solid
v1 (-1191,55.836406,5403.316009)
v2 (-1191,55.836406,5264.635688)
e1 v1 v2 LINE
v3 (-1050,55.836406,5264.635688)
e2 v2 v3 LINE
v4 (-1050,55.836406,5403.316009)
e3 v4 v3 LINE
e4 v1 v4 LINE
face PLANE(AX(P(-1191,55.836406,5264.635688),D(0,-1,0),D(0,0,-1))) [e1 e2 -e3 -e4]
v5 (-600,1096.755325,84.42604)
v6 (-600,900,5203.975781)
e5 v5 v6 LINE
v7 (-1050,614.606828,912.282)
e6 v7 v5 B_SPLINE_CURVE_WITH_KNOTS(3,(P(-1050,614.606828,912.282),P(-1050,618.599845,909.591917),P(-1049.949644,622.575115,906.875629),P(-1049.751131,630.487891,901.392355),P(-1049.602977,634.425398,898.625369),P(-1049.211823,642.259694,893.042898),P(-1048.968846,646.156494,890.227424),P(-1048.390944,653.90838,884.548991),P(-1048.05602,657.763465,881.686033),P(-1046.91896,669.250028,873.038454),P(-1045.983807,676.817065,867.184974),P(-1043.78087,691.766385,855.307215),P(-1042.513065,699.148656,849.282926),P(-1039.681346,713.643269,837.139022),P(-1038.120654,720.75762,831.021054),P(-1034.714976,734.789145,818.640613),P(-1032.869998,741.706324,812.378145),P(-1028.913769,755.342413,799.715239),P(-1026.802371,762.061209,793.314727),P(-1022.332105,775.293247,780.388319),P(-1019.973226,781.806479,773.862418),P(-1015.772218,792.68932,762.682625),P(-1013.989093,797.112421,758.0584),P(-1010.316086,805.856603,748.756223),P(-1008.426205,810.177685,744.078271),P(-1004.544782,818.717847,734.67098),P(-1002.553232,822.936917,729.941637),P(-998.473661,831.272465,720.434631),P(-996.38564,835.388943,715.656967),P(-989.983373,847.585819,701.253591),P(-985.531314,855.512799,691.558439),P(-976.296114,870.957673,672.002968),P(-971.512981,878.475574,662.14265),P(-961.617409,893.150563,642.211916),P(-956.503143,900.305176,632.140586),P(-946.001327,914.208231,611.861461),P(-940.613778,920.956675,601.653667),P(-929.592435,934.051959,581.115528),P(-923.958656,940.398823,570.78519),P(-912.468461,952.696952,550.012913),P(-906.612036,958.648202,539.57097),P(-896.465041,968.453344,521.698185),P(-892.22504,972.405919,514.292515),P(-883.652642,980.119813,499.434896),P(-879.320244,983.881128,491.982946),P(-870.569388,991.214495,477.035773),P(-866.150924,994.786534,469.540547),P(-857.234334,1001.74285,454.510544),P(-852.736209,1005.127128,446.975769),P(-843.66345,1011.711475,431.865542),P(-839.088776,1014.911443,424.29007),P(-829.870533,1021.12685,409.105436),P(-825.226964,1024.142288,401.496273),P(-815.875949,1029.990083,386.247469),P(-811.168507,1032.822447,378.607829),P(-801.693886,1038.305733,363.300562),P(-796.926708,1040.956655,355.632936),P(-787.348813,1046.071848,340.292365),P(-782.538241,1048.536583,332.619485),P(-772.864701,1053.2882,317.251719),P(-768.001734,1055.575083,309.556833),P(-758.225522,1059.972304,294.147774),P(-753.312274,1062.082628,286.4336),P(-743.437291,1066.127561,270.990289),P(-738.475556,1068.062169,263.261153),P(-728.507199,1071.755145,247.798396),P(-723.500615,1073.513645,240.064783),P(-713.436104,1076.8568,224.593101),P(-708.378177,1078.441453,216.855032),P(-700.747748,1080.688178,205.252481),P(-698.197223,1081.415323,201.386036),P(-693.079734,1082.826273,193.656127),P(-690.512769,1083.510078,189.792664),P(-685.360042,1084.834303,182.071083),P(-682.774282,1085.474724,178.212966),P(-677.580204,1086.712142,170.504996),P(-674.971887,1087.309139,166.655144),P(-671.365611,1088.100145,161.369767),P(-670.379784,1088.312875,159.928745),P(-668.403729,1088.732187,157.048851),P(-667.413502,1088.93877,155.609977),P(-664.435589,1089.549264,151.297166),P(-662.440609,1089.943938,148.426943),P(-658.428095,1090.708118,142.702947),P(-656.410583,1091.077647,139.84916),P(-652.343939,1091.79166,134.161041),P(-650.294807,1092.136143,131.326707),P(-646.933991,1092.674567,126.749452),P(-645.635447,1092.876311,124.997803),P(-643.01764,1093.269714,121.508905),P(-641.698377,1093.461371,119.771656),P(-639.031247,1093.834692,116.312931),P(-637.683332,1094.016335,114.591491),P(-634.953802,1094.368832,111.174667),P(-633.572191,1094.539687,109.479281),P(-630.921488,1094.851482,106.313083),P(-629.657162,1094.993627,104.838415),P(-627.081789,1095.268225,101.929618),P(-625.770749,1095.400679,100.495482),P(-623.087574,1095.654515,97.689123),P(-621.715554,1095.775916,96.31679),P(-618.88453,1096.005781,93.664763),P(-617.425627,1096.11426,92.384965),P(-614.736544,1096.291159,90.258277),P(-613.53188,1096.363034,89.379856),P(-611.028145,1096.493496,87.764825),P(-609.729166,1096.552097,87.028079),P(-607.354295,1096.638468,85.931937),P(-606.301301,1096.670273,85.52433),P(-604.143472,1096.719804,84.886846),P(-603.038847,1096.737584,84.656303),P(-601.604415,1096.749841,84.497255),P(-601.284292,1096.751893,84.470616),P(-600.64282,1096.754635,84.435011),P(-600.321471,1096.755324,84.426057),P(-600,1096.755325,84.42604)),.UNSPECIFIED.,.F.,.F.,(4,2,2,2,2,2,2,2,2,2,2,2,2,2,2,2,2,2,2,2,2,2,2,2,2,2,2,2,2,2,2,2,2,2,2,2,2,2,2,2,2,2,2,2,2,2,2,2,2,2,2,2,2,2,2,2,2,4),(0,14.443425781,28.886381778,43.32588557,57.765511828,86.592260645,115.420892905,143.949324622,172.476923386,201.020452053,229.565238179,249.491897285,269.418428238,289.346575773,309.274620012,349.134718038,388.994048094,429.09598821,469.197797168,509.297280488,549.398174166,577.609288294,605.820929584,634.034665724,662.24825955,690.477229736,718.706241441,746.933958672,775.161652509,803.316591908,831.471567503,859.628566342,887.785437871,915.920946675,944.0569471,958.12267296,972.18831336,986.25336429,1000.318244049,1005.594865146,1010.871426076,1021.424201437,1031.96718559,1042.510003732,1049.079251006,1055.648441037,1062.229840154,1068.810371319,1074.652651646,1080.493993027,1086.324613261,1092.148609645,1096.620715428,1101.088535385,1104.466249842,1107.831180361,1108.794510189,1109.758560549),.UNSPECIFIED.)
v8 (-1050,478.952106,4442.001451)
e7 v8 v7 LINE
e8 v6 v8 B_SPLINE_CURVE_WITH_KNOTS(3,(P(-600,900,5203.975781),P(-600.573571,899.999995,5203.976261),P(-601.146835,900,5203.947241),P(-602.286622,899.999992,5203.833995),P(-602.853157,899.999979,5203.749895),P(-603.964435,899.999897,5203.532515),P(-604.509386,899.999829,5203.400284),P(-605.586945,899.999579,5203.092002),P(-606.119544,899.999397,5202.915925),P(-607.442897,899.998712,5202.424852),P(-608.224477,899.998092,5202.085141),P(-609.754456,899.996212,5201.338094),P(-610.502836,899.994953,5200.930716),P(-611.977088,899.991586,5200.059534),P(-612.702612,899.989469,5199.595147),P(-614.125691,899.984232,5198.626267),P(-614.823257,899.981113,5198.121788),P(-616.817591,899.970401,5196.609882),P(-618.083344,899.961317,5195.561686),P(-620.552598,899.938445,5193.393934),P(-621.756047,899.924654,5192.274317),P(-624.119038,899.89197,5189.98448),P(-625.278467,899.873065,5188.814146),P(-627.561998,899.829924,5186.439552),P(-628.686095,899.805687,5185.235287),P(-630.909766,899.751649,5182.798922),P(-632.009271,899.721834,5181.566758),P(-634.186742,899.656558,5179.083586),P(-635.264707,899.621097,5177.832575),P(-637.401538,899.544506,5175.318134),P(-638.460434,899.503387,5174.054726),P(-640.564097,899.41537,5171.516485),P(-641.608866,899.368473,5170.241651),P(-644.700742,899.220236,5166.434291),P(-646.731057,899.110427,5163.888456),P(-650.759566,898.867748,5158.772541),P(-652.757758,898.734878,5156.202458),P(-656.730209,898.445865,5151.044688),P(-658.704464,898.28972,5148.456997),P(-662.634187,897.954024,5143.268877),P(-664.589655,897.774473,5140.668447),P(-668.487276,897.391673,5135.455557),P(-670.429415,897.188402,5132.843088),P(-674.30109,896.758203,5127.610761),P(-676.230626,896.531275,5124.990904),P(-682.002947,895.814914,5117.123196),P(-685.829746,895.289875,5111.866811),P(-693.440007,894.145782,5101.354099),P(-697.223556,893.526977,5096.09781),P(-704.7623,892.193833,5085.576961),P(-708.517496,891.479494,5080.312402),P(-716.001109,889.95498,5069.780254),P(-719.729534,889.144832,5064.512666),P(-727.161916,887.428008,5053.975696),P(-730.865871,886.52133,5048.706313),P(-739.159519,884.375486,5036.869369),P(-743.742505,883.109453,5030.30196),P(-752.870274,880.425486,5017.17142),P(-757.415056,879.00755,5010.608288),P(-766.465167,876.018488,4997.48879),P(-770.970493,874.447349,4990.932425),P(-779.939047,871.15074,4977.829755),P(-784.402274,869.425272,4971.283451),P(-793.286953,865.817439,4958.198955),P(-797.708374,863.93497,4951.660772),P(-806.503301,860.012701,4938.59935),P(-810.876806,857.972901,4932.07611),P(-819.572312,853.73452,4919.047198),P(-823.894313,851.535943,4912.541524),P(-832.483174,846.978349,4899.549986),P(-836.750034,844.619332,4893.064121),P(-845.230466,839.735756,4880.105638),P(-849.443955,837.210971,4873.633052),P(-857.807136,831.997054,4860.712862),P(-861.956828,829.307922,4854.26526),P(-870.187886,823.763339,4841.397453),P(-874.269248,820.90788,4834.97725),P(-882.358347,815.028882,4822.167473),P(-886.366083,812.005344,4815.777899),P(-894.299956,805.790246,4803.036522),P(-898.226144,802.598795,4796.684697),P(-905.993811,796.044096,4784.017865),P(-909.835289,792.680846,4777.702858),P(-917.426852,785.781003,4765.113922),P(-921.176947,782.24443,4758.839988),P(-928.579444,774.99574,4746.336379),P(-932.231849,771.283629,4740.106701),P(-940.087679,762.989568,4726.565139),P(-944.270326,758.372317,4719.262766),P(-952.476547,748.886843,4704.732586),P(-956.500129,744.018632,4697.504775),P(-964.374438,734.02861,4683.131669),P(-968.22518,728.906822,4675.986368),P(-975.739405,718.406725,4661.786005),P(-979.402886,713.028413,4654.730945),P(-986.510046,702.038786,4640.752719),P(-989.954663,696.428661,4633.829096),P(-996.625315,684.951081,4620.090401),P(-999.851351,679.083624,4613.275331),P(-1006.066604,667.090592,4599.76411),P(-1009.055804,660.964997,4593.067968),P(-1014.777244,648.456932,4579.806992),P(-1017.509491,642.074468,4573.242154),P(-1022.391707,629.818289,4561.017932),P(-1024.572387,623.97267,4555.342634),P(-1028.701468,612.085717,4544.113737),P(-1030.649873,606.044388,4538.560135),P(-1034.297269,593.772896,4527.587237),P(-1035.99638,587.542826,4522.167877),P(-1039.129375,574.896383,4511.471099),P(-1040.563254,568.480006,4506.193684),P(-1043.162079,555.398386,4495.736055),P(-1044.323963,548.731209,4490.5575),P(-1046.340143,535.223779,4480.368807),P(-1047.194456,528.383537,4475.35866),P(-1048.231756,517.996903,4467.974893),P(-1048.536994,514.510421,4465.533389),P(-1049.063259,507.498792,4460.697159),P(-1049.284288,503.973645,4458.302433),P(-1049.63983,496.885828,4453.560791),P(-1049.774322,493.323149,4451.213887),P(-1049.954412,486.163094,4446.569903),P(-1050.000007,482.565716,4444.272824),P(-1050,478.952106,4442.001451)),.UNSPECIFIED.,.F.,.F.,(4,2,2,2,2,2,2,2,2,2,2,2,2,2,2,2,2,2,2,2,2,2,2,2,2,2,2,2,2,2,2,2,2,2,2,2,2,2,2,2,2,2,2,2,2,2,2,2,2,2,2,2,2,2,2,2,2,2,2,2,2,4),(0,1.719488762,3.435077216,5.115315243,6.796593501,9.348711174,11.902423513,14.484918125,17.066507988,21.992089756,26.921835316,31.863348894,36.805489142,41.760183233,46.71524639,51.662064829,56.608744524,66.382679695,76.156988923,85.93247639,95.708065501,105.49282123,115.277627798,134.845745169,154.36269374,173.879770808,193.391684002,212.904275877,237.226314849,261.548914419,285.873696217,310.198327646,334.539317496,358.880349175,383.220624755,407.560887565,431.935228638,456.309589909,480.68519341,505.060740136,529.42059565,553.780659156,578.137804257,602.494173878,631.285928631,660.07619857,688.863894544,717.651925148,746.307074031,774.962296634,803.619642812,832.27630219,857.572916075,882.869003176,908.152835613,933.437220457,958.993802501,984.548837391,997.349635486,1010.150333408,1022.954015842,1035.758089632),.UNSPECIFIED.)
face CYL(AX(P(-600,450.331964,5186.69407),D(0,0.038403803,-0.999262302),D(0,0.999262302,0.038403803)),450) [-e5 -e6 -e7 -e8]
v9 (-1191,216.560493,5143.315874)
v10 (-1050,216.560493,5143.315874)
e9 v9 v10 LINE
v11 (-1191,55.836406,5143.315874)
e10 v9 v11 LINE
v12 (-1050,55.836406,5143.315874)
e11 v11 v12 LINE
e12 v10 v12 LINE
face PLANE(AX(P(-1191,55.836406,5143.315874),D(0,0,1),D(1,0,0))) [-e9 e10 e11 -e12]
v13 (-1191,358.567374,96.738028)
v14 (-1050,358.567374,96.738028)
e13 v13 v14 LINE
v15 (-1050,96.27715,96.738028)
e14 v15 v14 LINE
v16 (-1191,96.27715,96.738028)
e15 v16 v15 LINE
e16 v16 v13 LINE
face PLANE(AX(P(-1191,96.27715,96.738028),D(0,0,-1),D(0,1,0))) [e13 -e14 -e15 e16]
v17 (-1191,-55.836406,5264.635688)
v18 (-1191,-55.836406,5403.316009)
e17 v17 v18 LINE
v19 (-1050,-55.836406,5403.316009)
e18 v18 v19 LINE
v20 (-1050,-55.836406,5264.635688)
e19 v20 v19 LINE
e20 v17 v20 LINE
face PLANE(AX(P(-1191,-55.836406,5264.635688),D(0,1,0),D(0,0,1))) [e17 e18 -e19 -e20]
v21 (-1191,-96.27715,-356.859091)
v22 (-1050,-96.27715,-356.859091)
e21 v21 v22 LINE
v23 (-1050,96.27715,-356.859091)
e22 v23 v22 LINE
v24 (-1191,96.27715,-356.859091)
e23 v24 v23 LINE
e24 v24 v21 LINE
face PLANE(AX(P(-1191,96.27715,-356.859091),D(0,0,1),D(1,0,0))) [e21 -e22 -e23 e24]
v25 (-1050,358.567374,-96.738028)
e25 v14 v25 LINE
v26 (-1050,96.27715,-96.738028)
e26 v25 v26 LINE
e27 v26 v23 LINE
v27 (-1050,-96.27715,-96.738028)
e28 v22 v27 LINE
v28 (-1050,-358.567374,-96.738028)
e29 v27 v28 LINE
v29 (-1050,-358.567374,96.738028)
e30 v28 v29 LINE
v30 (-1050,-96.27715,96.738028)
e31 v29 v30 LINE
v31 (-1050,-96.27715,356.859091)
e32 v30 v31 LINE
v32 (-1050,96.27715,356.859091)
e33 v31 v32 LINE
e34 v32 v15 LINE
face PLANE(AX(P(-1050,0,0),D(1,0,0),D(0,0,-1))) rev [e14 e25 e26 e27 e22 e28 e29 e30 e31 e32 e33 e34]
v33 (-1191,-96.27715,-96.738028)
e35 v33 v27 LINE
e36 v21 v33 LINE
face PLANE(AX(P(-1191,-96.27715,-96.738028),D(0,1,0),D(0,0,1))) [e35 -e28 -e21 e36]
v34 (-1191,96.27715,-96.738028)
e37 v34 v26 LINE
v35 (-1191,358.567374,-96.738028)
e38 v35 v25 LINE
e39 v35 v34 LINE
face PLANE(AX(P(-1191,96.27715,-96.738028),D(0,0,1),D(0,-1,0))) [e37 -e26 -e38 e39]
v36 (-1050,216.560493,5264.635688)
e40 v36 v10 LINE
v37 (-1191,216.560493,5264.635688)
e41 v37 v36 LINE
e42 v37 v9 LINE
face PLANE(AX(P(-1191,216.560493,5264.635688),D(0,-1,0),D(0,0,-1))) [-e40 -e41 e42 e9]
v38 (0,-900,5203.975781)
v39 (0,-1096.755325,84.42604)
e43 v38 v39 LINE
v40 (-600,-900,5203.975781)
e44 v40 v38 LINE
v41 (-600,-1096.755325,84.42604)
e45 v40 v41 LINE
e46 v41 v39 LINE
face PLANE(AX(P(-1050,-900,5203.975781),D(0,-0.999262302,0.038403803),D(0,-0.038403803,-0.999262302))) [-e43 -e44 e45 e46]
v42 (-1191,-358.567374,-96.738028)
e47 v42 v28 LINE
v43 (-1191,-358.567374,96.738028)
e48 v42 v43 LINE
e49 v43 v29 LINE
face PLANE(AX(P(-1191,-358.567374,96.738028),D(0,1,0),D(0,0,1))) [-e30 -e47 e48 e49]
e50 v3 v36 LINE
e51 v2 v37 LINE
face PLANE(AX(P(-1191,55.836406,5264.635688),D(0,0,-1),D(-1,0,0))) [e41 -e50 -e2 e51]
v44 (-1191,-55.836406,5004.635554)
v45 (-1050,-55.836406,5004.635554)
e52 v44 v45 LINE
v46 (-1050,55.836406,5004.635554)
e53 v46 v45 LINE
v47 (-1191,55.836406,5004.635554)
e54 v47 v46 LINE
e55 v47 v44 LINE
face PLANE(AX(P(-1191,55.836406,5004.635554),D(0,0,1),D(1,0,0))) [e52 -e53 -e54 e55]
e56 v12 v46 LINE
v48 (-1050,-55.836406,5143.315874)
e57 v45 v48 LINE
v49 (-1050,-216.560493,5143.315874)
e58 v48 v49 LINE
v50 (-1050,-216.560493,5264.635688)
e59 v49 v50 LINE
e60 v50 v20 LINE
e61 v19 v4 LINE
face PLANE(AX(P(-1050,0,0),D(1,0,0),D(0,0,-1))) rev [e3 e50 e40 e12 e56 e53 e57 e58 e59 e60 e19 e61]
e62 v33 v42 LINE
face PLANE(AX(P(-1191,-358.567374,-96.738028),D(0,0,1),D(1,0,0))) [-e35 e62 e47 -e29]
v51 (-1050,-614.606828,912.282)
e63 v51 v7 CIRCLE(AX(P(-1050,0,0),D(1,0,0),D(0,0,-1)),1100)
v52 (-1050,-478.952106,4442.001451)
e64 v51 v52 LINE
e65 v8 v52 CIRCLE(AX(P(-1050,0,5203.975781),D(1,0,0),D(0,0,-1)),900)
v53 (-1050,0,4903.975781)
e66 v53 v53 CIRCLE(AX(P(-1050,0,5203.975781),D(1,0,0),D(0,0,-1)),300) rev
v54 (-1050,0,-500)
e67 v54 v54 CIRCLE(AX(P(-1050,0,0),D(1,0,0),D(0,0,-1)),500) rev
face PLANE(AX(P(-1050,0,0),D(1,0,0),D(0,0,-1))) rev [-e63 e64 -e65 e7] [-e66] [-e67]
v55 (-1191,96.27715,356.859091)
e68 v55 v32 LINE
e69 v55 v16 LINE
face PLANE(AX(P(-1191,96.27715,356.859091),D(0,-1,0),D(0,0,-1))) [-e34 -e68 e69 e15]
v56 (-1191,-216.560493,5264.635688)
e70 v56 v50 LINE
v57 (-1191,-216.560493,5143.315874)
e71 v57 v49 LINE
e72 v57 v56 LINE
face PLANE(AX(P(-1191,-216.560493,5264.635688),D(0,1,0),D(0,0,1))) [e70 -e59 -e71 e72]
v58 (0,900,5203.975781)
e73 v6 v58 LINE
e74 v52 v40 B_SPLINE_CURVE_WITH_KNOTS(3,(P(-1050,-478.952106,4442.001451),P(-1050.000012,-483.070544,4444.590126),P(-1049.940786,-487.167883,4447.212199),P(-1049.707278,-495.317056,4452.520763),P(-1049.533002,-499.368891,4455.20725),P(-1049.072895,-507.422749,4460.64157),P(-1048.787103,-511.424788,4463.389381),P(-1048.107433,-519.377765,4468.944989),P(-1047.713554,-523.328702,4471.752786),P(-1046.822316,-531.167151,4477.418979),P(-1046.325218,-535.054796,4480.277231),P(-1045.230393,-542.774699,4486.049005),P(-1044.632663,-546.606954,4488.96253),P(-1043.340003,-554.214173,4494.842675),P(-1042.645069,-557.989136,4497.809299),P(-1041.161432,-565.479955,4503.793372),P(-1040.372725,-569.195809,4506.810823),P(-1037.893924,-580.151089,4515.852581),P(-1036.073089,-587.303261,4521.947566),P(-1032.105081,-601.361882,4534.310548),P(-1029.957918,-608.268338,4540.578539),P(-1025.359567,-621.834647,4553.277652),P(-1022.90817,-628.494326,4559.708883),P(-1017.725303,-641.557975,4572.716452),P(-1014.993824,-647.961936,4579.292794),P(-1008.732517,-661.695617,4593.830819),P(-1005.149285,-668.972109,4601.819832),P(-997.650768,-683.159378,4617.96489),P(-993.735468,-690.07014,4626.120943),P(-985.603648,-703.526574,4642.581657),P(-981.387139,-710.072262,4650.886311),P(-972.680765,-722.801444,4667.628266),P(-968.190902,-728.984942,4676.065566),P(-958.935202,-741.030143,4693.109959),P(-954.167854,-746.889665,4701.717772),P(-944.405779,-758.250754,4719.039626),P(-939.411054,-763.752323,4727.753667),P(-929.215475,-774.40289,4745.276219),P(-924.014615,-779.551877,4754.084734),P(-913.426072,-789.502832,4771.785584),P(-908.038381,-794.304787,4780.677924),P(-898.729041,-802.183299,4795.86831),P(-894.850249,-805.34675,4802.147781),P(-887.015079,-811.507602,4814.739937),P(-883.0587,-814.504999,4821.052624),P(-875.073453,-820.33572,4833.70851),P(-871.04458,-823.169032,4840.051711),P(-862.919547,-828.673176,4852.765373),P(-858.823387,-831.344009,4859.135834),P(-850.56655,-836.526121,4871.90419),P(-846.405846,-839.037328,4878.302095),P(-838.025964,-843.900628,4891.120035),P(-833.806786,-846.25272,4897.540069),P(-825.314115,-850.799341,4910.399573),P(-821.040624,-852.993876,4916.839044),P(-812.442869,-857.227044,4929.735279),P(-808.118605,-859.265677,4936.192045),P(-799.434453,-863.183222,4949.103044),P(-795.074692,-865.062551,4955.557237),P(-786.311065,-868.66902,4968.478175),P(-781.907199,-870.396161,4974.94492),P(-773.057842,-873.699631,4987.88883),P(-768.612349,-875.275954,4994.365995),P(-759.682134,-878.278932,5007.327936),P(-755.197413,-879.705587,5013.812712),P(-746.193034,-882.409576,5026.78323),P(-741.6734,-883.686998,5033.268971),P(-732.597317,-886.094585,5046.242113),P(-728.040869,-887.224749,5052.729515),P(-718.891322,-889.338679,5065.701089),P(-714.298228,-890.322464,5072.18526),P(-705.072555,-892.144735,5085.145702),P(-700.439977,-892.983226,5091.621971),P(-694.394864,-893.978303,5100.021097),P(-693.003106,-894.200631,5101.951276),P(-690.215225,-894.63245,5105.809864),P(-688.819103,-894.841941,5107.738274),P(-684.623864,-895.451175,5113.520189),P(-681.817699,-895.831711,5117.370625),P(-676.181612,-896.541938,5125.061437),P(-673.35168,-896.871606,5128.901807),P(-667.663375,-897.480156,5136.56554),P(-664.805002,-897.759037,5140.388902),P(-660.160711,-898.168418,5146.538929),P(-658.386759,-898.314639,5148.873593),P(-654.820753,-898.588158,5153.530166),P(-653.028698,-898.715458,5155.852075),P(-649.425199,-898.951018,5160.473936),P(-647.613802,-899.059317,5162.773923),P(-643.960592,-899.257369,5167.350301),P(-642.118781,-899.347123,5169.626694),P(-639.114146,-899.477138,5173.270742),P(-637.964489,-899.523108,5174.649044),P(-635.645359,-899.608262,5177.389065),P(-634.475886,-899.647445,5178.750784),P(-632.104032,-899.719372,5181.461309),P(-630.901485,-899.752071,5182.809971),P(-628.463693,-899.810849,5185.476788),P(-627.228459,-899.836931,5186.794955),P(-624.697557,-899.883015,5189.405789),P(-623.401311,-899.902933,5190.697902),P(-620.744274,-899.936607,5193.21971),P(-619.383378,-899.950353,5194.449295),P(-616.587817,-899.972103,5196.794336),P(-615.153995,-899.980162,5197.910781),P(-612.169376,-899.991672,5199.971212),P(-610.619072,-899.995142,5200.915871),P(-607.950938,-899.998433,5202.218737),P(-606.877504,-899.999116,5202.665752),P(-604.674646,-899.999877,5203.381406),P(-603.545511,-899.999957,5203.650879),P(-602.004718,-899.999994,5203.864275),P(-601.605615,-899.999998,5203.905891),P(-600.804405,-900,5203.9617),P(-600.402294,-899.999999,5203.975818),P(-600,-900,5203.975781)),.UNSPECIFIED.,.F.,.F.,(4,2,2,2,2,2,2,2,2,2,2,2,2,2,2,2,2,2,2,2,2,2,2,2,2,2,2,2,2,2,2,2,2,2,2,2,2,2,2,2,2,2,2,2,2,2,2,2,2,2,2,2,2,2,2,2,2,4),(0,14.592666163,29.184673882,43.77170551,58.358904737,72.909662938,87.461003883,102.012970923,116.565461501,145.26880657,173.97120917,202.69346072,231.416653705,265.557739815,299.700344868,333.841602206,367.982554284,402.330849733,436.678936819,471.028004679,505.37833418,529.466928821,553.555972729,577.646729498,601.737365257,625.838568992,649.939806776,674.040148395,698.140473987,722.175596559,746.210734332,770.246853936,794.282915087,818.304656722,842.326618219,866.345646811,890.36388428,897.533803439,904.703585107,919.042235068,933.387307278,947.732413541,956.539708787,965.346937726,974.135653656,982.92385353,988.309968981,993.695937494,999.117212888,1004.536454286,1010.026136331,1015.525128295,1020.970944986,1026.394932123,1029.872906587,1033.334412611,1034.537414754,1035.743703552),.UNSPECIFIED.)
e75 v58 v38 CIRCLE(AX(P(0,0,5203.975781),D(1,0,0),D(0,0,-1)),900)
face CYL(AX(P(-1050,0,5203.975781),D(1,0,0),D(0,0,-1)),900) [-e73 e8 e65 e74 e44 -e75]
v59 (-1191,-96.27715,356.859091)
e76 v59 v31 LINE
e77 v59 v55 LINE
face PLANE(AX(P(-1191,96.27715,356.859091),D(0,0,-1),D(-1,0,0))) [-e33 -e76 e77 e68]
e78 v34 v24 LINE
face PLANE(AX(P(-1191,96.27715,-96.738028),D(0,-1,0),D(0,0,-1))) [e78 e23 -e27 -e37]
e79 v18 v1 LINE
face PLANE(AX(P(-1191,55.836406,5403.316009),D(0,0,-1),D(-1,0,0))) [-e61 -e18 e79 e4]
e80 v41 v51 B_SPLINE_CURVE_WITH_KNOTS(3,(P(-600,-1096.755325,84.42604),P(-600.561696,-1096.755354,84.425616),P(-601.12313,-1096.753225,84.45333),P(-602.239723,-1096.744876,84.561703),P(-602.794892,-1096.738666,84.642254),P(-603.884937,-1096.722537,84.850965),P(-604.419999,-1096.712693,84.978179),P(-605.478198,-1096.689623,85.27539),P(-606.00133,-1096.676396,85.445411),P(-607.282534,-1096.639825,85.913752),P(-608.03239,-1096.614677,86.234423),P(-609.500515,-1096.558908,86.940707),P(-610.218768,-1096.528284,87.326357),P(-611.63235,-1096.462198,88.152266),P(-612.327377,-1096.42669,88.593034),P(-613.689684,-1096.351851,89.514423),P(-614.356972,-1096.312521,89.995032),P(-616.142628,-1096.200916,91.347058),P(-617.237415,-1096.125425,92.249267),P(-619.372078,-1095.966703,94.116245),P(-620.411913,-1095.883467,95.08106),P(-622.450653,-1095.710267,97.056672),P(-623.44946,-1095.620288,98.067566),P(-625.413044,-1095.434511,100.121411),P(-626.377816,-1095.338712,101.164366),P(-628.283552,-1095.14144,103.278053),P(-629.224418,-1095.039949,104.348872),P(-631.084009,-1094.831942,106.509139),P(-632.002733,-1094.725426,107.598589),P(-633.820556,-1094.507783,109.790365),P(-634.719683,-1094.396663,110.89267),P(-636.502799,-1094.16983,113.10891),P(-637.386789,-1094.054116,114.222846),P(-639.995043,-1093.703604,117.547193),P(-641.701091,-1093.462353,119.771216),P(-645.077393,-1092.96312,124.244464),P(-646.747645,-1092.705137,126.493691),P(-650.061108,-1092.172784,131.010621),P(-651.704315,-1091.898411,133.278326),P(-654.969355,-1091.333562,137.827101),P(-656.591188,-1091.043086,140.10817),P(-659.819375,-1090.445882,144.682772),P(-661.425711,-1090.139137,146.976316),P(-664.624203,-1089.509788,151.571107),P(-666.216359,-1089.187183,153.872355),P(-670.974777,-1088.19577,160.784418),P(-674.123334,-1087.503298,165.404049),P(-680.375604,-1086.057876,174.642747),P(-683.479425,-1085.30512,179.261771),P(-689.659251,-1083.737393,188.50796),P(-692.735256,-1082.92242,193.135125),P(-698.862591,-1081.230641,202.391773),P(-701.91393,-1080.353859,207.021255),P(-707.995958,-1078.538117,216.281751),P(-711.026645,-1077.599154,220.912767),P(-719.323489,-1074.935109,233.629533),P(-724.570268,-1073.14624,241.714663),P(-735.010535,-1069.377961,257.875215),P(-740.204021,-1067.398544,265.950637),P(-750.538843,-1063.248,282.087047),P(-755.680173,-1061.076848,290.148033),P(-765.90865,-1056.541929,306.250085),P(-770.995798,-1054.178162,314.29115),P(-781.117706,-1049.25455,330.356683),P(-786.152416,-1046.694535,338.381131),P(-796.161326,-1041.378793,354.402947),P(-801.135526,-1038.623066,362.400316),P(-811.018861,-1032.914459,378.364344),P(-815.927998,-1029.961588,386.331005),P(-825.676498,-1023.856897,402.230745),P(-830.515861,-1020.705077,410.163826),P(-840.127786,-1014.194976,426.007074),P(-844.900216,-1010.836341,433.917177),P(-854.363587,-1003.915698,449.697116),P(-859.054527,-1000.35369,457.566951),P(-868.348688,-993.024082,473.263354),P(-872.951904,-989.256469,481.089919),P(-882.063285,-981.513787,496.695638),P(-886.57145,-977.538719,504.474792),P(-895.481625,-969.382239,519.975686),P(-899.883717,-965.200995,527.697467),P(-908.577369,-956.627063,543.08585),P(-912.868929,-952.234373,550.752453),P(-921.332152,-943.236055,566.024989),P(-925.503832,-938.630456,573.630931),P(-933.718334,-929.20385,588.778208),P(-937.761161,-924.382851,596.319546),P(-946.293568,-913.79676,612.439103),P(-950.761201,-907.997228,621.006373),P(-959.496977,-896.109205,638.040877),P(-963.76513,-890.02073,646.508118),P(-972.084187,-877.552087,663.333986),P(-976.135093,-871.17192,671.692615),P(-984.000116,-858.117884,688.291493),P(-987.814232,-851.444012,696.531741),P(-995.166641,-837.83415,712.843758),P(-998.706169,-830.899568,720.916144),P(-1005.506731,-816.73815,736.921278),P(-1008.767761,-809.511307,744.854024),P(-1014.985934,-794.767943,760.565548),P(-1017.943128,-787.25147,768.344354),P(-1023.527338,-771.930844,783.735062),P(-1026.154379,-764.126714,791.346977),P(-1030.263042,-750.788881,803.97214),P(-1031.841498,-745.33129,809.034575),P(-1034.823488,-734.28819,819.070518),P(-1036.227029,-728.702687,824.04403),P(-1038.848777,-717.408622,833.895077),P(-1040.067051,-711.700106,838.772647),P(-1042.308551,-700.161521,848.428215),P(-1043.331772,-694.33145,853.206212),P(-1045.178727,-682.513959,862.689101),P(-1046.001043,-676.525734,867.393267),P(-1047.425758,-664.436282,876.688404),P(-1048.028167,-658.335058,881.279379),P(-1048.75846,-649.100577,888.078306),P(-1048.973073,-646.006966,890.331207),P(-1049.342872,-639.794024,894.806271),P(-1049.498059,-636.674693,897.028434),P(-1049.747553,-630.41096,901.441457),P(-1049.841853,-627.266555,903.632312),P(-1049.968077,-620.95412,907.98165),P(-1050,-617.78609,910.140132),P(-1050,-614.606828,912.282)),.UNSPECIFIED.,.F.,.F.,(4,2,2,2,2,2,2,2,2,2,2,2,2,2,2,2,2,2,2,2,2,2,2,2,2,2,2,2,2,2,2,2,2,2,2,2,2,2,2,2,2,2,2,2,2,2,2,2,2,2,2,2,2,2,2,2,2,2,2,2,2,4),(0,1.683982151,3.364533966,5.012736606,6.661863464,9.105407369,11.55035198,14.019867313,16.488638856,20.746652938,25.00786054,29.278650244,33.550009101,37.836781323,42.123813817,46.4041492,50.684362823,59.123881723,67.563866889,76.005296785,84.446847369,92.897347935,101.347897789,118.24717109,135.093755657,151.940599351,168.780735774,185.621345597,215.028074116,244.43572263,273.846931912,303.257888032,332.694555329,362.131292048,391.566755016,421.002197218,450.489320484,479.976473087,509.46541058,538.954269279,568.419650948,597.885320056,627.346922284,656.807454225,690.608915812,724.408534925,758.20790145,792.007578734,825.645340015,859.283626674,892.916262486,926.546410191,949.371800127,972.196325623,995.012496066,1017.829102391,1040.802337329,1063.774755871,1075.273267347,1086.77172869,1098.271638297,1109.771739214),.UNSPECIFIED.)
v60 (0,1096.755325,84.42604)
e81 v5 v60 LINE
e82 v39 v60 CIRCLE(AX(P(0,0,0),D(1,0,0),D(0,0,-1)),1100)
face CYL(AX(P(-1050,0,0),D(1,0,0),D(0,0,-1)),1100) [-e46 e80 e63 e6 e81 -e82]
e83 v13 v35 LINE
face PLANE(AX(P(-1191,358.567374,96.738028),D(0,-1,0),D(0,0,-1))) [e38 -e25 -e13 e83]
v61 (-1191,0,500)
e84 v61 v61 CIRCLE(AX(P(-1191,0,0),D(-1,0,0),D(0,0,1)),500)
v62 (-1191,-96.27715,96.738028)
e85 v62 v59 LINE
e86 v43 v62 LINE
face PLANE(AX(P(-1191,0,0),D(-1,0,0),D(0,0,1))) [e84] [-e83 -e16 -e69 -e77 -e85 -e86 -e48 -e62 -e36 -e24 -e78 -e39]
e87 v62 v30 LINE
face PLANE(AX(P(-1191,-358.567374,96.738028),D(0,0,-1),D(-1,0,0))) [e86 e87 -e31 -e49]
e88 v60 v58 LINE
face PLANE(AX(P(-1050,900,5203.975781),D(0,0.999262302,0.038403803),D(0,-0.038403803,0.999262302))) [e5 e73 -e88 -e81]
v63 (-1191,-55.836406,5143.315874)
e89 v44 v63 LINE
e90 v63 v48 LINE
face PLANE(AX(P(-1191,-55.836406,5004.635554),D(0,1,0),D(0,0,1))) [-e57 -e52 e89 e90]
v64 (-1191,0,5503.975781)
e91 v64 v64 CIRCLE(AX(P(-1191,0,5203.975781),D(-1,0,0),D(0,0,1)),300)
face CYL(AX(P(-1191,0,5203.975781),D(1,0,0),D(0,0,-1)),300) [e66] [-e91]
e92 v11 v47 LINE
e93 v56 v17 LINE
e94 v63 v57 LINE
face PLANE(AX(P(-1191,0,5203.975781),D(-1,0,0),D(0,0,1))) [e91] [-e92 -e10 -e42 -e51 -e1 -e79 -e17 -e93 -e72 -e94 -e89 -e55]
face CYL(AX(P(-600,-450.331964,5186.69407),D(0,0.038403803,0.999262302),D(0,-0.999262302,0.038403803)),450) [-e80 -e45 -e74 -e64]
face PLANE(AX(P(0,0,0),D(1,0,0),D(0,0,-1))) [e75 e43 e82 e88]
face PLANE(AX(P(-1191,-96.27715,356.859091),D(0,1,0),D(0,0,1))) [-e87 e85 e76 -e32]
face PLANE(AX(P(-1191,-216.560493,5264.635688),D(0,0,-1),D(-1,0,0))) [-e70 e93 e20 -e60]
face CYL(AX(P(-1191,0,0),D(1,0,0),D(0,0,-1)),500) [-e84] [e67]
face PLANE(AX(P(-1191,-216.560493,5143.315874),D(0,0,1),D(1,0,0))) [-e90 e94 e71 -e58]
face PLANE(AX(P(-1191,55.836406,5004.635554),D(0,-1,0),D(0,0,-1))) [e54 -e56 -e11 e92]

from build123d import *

# Parameters (mm, degrees)
BOSS_EXTRUDE11_DEPTH = 1050
FILLET3_R            = 450
FILLET4_R            = 450
SKETCH14_R           = 500
SKETCH14_R_2         = 300
BOSS_EXTRUDE12_DEPTH = 141


with BuildPart() as part:
    # Sketch13 → Boss-Extrude11 (new body)
    with BuildSketch(Plane(origin=(0, 0, 0), x_dir=(0, 0, -1), z_dir=(1, 0, 0))):
        with BuildLine():
            Line((-5203.97578109, 900), (-84.426039545, 1096.755325424))
            ThreePointArc((-84.426039545, 1096.755325424), (1100, 0), (-84.426039545, -1096.755325424))
            Line((-84.426039545, -1096.755325424), (-5203.97578109, -900))
            ThreePointArc((-5203.97578109, -900), (-6103.97578109, 0), (-5203.97578109, 900))
        make_face()
    extrude(amount=-BOSS_EXTRUDE11_DEPTH)

    # Fillet3
    # the kernel refuses this fillet: 450 mm, written as the material it takes off along each edge
    with BuildSketch(Plane(origin=(-1050, 856.795721699, 6328.145870684), x_dir=(1, 0, 0), z_dir=(0, 0.038403802934356995, -0.9992623018608172))) as fillet3_piece_1_section:
        with BuildLine():
            CenterArc((FILLET3_R, FILLET3_R), FILLET3_R, 180, 90)
            Line((0, FILLET3_R), (-FILLET3_R * 0.02, FILLET3_R))
            Line((-FILLET3_R * 0.02, FILLET3_R), (-FILLET3_R * 0.02, -FILLET3_R * 0.02))
            Line((-FILLET3_R * 0.02, -FILLET3_R * 0.02), (FILLET3_R, -FILLET3_R * 0.02))
            Line((FILLET3_R, -FILLET3_R * 0.02), (FILLET3_R, 0))
        make_face()
    fillet3_piece_1 = extrude(amount=7373.329211972, mode=Mode.PRIVATE)
    fillet3_piece_1 = fillet3_piece_1 - Plane(origin=(-939.154222866, 0, 5203.97578109), x_dir=(0, -1, 0), z_dir=(1, 0, 0)) * Cylinder(900, 16547, mode=Mode.PRIVATE)
    fillet3_piece_1 = fillet3_piece_1 - Plane(origin=(-939.154222866, 0, 0), x_dir=(0, 0.9970502958403585, 0.07675094504078517), z_dir=(1, 0, 0)) * Cylinder(1100, 16547, mode=Mode.PRIVATE)
    add(fillet3_piece_1, mode=Mode.SUBTRACT)

    # Fillet4
    # the kernel refuses this fillet: 450 mm, written as the material it takes off along each edge
    with BuildSketch(Plane(origin=(-1050, -1139.959603726, -1039.744050049), x_dir=(1, 0, 0), z_dir=(0, 0.038403802934357, 0.9992623018608173))) as fillet4_piece_1_section:
        with BuildLine():
            CenterArc((FILLET4_R, FILLET4_R), FILLET4_R, 180, 90)
            Line((0, FILLET4_R), (-FILLET4_R * 0.02, FILLET4_R))
            Line((-FILLET4_R * 0.02, FILLET4_R), (-FILLET4_R * 0.02, -FILLET4_R * 0.02))
            Line((-FILLET4_R * 0.02, -FILLET4_R * 0.02), (FILLET4_R, -FILLET4_R * 0.02))
            Line((FILLET4_R, -FILLET4_R * 0.02), (FILLET4_R, 0))
        make_face()
    fillet4_piece_1 = extrude(amount=7373.329211972, mode=Mode.PRIVATE)
    fillet4_piece_1 = fillet4_piece_1 - Plane(origin=(-939.14440513, 0, 0), x_dir=(0, 0.9970502958403585, 0.07675094504078517), z_dir=(1, 0, 0)) * Cylinder(1100, 16547, mode=Mode.PRIVATE)
    fillet4_piece_1 = fillet4_piece_1 - Plane(origin=(-939.14440513, 0, 5203.97578109), x_dir=(0, -1, 0), z_dir=(1, 0, 0)) * Cylinder(900, 16547, mode=Mode.PRIVATE)
    add(fillet4_piece_1, mode=Mode.SUBTRACT)

    # Sketch14 → Boss-Extrude12 (add)
    # profile 1 of 2: a face of its own
    with BuildSketch(Plane.ZY.offset(1050)):
        with Locations(Location((0, 0, 0), (0, 0, 180))):
            Circle(SKETCH14_R)
        Polygon((-96.738028444, 96.277150217), (-96.738028444, 358.567374068), (96.738028444, 358.567374068), (96.738028444, 96.277150217), (356.859091418, 96.277150217), (356.859091418, -96.277150217), (96.738028444, -96.277150217), (96.738028444, -358.567374068), (-96.738028444, -358.567374068), (-96.738028444, -96.277150217), (-356.859091418, -96.277150217), (-356.859091418, 96.277150217), align=None, mode=Mode.SUBTRACT)
    # profile 2 of 2: a face of its own
    with BuildSketch(Plane.ZY.offset(1050)):
        with Locations(Location((5203.97578109, 0, 0), (0, 0, 180))):
            Circle(SKETCH14_R_2)
        Polygon((5264.6356884, 55.836406433), (5403.316008511, 55.836406433), (5403.316008511, -55.836406433), (5264.6356884, -55.836406433), (5264.6356884, -216.560493249), (5143.315873781, -216.560493249), (5143.315873781, -55.836406433), (5004.63555367, -55.836406433), (5004.63555367, 55.836406433), (5143.315873781, 55.836406433), (5143.315873781, 216.560493249), (5264.6356884, 216.560493249), align=None, mode=Mode.SUBTRACT)
    extrude(amount=BOSS_EXTRUDE12_DEPTH)


solid = part.part
